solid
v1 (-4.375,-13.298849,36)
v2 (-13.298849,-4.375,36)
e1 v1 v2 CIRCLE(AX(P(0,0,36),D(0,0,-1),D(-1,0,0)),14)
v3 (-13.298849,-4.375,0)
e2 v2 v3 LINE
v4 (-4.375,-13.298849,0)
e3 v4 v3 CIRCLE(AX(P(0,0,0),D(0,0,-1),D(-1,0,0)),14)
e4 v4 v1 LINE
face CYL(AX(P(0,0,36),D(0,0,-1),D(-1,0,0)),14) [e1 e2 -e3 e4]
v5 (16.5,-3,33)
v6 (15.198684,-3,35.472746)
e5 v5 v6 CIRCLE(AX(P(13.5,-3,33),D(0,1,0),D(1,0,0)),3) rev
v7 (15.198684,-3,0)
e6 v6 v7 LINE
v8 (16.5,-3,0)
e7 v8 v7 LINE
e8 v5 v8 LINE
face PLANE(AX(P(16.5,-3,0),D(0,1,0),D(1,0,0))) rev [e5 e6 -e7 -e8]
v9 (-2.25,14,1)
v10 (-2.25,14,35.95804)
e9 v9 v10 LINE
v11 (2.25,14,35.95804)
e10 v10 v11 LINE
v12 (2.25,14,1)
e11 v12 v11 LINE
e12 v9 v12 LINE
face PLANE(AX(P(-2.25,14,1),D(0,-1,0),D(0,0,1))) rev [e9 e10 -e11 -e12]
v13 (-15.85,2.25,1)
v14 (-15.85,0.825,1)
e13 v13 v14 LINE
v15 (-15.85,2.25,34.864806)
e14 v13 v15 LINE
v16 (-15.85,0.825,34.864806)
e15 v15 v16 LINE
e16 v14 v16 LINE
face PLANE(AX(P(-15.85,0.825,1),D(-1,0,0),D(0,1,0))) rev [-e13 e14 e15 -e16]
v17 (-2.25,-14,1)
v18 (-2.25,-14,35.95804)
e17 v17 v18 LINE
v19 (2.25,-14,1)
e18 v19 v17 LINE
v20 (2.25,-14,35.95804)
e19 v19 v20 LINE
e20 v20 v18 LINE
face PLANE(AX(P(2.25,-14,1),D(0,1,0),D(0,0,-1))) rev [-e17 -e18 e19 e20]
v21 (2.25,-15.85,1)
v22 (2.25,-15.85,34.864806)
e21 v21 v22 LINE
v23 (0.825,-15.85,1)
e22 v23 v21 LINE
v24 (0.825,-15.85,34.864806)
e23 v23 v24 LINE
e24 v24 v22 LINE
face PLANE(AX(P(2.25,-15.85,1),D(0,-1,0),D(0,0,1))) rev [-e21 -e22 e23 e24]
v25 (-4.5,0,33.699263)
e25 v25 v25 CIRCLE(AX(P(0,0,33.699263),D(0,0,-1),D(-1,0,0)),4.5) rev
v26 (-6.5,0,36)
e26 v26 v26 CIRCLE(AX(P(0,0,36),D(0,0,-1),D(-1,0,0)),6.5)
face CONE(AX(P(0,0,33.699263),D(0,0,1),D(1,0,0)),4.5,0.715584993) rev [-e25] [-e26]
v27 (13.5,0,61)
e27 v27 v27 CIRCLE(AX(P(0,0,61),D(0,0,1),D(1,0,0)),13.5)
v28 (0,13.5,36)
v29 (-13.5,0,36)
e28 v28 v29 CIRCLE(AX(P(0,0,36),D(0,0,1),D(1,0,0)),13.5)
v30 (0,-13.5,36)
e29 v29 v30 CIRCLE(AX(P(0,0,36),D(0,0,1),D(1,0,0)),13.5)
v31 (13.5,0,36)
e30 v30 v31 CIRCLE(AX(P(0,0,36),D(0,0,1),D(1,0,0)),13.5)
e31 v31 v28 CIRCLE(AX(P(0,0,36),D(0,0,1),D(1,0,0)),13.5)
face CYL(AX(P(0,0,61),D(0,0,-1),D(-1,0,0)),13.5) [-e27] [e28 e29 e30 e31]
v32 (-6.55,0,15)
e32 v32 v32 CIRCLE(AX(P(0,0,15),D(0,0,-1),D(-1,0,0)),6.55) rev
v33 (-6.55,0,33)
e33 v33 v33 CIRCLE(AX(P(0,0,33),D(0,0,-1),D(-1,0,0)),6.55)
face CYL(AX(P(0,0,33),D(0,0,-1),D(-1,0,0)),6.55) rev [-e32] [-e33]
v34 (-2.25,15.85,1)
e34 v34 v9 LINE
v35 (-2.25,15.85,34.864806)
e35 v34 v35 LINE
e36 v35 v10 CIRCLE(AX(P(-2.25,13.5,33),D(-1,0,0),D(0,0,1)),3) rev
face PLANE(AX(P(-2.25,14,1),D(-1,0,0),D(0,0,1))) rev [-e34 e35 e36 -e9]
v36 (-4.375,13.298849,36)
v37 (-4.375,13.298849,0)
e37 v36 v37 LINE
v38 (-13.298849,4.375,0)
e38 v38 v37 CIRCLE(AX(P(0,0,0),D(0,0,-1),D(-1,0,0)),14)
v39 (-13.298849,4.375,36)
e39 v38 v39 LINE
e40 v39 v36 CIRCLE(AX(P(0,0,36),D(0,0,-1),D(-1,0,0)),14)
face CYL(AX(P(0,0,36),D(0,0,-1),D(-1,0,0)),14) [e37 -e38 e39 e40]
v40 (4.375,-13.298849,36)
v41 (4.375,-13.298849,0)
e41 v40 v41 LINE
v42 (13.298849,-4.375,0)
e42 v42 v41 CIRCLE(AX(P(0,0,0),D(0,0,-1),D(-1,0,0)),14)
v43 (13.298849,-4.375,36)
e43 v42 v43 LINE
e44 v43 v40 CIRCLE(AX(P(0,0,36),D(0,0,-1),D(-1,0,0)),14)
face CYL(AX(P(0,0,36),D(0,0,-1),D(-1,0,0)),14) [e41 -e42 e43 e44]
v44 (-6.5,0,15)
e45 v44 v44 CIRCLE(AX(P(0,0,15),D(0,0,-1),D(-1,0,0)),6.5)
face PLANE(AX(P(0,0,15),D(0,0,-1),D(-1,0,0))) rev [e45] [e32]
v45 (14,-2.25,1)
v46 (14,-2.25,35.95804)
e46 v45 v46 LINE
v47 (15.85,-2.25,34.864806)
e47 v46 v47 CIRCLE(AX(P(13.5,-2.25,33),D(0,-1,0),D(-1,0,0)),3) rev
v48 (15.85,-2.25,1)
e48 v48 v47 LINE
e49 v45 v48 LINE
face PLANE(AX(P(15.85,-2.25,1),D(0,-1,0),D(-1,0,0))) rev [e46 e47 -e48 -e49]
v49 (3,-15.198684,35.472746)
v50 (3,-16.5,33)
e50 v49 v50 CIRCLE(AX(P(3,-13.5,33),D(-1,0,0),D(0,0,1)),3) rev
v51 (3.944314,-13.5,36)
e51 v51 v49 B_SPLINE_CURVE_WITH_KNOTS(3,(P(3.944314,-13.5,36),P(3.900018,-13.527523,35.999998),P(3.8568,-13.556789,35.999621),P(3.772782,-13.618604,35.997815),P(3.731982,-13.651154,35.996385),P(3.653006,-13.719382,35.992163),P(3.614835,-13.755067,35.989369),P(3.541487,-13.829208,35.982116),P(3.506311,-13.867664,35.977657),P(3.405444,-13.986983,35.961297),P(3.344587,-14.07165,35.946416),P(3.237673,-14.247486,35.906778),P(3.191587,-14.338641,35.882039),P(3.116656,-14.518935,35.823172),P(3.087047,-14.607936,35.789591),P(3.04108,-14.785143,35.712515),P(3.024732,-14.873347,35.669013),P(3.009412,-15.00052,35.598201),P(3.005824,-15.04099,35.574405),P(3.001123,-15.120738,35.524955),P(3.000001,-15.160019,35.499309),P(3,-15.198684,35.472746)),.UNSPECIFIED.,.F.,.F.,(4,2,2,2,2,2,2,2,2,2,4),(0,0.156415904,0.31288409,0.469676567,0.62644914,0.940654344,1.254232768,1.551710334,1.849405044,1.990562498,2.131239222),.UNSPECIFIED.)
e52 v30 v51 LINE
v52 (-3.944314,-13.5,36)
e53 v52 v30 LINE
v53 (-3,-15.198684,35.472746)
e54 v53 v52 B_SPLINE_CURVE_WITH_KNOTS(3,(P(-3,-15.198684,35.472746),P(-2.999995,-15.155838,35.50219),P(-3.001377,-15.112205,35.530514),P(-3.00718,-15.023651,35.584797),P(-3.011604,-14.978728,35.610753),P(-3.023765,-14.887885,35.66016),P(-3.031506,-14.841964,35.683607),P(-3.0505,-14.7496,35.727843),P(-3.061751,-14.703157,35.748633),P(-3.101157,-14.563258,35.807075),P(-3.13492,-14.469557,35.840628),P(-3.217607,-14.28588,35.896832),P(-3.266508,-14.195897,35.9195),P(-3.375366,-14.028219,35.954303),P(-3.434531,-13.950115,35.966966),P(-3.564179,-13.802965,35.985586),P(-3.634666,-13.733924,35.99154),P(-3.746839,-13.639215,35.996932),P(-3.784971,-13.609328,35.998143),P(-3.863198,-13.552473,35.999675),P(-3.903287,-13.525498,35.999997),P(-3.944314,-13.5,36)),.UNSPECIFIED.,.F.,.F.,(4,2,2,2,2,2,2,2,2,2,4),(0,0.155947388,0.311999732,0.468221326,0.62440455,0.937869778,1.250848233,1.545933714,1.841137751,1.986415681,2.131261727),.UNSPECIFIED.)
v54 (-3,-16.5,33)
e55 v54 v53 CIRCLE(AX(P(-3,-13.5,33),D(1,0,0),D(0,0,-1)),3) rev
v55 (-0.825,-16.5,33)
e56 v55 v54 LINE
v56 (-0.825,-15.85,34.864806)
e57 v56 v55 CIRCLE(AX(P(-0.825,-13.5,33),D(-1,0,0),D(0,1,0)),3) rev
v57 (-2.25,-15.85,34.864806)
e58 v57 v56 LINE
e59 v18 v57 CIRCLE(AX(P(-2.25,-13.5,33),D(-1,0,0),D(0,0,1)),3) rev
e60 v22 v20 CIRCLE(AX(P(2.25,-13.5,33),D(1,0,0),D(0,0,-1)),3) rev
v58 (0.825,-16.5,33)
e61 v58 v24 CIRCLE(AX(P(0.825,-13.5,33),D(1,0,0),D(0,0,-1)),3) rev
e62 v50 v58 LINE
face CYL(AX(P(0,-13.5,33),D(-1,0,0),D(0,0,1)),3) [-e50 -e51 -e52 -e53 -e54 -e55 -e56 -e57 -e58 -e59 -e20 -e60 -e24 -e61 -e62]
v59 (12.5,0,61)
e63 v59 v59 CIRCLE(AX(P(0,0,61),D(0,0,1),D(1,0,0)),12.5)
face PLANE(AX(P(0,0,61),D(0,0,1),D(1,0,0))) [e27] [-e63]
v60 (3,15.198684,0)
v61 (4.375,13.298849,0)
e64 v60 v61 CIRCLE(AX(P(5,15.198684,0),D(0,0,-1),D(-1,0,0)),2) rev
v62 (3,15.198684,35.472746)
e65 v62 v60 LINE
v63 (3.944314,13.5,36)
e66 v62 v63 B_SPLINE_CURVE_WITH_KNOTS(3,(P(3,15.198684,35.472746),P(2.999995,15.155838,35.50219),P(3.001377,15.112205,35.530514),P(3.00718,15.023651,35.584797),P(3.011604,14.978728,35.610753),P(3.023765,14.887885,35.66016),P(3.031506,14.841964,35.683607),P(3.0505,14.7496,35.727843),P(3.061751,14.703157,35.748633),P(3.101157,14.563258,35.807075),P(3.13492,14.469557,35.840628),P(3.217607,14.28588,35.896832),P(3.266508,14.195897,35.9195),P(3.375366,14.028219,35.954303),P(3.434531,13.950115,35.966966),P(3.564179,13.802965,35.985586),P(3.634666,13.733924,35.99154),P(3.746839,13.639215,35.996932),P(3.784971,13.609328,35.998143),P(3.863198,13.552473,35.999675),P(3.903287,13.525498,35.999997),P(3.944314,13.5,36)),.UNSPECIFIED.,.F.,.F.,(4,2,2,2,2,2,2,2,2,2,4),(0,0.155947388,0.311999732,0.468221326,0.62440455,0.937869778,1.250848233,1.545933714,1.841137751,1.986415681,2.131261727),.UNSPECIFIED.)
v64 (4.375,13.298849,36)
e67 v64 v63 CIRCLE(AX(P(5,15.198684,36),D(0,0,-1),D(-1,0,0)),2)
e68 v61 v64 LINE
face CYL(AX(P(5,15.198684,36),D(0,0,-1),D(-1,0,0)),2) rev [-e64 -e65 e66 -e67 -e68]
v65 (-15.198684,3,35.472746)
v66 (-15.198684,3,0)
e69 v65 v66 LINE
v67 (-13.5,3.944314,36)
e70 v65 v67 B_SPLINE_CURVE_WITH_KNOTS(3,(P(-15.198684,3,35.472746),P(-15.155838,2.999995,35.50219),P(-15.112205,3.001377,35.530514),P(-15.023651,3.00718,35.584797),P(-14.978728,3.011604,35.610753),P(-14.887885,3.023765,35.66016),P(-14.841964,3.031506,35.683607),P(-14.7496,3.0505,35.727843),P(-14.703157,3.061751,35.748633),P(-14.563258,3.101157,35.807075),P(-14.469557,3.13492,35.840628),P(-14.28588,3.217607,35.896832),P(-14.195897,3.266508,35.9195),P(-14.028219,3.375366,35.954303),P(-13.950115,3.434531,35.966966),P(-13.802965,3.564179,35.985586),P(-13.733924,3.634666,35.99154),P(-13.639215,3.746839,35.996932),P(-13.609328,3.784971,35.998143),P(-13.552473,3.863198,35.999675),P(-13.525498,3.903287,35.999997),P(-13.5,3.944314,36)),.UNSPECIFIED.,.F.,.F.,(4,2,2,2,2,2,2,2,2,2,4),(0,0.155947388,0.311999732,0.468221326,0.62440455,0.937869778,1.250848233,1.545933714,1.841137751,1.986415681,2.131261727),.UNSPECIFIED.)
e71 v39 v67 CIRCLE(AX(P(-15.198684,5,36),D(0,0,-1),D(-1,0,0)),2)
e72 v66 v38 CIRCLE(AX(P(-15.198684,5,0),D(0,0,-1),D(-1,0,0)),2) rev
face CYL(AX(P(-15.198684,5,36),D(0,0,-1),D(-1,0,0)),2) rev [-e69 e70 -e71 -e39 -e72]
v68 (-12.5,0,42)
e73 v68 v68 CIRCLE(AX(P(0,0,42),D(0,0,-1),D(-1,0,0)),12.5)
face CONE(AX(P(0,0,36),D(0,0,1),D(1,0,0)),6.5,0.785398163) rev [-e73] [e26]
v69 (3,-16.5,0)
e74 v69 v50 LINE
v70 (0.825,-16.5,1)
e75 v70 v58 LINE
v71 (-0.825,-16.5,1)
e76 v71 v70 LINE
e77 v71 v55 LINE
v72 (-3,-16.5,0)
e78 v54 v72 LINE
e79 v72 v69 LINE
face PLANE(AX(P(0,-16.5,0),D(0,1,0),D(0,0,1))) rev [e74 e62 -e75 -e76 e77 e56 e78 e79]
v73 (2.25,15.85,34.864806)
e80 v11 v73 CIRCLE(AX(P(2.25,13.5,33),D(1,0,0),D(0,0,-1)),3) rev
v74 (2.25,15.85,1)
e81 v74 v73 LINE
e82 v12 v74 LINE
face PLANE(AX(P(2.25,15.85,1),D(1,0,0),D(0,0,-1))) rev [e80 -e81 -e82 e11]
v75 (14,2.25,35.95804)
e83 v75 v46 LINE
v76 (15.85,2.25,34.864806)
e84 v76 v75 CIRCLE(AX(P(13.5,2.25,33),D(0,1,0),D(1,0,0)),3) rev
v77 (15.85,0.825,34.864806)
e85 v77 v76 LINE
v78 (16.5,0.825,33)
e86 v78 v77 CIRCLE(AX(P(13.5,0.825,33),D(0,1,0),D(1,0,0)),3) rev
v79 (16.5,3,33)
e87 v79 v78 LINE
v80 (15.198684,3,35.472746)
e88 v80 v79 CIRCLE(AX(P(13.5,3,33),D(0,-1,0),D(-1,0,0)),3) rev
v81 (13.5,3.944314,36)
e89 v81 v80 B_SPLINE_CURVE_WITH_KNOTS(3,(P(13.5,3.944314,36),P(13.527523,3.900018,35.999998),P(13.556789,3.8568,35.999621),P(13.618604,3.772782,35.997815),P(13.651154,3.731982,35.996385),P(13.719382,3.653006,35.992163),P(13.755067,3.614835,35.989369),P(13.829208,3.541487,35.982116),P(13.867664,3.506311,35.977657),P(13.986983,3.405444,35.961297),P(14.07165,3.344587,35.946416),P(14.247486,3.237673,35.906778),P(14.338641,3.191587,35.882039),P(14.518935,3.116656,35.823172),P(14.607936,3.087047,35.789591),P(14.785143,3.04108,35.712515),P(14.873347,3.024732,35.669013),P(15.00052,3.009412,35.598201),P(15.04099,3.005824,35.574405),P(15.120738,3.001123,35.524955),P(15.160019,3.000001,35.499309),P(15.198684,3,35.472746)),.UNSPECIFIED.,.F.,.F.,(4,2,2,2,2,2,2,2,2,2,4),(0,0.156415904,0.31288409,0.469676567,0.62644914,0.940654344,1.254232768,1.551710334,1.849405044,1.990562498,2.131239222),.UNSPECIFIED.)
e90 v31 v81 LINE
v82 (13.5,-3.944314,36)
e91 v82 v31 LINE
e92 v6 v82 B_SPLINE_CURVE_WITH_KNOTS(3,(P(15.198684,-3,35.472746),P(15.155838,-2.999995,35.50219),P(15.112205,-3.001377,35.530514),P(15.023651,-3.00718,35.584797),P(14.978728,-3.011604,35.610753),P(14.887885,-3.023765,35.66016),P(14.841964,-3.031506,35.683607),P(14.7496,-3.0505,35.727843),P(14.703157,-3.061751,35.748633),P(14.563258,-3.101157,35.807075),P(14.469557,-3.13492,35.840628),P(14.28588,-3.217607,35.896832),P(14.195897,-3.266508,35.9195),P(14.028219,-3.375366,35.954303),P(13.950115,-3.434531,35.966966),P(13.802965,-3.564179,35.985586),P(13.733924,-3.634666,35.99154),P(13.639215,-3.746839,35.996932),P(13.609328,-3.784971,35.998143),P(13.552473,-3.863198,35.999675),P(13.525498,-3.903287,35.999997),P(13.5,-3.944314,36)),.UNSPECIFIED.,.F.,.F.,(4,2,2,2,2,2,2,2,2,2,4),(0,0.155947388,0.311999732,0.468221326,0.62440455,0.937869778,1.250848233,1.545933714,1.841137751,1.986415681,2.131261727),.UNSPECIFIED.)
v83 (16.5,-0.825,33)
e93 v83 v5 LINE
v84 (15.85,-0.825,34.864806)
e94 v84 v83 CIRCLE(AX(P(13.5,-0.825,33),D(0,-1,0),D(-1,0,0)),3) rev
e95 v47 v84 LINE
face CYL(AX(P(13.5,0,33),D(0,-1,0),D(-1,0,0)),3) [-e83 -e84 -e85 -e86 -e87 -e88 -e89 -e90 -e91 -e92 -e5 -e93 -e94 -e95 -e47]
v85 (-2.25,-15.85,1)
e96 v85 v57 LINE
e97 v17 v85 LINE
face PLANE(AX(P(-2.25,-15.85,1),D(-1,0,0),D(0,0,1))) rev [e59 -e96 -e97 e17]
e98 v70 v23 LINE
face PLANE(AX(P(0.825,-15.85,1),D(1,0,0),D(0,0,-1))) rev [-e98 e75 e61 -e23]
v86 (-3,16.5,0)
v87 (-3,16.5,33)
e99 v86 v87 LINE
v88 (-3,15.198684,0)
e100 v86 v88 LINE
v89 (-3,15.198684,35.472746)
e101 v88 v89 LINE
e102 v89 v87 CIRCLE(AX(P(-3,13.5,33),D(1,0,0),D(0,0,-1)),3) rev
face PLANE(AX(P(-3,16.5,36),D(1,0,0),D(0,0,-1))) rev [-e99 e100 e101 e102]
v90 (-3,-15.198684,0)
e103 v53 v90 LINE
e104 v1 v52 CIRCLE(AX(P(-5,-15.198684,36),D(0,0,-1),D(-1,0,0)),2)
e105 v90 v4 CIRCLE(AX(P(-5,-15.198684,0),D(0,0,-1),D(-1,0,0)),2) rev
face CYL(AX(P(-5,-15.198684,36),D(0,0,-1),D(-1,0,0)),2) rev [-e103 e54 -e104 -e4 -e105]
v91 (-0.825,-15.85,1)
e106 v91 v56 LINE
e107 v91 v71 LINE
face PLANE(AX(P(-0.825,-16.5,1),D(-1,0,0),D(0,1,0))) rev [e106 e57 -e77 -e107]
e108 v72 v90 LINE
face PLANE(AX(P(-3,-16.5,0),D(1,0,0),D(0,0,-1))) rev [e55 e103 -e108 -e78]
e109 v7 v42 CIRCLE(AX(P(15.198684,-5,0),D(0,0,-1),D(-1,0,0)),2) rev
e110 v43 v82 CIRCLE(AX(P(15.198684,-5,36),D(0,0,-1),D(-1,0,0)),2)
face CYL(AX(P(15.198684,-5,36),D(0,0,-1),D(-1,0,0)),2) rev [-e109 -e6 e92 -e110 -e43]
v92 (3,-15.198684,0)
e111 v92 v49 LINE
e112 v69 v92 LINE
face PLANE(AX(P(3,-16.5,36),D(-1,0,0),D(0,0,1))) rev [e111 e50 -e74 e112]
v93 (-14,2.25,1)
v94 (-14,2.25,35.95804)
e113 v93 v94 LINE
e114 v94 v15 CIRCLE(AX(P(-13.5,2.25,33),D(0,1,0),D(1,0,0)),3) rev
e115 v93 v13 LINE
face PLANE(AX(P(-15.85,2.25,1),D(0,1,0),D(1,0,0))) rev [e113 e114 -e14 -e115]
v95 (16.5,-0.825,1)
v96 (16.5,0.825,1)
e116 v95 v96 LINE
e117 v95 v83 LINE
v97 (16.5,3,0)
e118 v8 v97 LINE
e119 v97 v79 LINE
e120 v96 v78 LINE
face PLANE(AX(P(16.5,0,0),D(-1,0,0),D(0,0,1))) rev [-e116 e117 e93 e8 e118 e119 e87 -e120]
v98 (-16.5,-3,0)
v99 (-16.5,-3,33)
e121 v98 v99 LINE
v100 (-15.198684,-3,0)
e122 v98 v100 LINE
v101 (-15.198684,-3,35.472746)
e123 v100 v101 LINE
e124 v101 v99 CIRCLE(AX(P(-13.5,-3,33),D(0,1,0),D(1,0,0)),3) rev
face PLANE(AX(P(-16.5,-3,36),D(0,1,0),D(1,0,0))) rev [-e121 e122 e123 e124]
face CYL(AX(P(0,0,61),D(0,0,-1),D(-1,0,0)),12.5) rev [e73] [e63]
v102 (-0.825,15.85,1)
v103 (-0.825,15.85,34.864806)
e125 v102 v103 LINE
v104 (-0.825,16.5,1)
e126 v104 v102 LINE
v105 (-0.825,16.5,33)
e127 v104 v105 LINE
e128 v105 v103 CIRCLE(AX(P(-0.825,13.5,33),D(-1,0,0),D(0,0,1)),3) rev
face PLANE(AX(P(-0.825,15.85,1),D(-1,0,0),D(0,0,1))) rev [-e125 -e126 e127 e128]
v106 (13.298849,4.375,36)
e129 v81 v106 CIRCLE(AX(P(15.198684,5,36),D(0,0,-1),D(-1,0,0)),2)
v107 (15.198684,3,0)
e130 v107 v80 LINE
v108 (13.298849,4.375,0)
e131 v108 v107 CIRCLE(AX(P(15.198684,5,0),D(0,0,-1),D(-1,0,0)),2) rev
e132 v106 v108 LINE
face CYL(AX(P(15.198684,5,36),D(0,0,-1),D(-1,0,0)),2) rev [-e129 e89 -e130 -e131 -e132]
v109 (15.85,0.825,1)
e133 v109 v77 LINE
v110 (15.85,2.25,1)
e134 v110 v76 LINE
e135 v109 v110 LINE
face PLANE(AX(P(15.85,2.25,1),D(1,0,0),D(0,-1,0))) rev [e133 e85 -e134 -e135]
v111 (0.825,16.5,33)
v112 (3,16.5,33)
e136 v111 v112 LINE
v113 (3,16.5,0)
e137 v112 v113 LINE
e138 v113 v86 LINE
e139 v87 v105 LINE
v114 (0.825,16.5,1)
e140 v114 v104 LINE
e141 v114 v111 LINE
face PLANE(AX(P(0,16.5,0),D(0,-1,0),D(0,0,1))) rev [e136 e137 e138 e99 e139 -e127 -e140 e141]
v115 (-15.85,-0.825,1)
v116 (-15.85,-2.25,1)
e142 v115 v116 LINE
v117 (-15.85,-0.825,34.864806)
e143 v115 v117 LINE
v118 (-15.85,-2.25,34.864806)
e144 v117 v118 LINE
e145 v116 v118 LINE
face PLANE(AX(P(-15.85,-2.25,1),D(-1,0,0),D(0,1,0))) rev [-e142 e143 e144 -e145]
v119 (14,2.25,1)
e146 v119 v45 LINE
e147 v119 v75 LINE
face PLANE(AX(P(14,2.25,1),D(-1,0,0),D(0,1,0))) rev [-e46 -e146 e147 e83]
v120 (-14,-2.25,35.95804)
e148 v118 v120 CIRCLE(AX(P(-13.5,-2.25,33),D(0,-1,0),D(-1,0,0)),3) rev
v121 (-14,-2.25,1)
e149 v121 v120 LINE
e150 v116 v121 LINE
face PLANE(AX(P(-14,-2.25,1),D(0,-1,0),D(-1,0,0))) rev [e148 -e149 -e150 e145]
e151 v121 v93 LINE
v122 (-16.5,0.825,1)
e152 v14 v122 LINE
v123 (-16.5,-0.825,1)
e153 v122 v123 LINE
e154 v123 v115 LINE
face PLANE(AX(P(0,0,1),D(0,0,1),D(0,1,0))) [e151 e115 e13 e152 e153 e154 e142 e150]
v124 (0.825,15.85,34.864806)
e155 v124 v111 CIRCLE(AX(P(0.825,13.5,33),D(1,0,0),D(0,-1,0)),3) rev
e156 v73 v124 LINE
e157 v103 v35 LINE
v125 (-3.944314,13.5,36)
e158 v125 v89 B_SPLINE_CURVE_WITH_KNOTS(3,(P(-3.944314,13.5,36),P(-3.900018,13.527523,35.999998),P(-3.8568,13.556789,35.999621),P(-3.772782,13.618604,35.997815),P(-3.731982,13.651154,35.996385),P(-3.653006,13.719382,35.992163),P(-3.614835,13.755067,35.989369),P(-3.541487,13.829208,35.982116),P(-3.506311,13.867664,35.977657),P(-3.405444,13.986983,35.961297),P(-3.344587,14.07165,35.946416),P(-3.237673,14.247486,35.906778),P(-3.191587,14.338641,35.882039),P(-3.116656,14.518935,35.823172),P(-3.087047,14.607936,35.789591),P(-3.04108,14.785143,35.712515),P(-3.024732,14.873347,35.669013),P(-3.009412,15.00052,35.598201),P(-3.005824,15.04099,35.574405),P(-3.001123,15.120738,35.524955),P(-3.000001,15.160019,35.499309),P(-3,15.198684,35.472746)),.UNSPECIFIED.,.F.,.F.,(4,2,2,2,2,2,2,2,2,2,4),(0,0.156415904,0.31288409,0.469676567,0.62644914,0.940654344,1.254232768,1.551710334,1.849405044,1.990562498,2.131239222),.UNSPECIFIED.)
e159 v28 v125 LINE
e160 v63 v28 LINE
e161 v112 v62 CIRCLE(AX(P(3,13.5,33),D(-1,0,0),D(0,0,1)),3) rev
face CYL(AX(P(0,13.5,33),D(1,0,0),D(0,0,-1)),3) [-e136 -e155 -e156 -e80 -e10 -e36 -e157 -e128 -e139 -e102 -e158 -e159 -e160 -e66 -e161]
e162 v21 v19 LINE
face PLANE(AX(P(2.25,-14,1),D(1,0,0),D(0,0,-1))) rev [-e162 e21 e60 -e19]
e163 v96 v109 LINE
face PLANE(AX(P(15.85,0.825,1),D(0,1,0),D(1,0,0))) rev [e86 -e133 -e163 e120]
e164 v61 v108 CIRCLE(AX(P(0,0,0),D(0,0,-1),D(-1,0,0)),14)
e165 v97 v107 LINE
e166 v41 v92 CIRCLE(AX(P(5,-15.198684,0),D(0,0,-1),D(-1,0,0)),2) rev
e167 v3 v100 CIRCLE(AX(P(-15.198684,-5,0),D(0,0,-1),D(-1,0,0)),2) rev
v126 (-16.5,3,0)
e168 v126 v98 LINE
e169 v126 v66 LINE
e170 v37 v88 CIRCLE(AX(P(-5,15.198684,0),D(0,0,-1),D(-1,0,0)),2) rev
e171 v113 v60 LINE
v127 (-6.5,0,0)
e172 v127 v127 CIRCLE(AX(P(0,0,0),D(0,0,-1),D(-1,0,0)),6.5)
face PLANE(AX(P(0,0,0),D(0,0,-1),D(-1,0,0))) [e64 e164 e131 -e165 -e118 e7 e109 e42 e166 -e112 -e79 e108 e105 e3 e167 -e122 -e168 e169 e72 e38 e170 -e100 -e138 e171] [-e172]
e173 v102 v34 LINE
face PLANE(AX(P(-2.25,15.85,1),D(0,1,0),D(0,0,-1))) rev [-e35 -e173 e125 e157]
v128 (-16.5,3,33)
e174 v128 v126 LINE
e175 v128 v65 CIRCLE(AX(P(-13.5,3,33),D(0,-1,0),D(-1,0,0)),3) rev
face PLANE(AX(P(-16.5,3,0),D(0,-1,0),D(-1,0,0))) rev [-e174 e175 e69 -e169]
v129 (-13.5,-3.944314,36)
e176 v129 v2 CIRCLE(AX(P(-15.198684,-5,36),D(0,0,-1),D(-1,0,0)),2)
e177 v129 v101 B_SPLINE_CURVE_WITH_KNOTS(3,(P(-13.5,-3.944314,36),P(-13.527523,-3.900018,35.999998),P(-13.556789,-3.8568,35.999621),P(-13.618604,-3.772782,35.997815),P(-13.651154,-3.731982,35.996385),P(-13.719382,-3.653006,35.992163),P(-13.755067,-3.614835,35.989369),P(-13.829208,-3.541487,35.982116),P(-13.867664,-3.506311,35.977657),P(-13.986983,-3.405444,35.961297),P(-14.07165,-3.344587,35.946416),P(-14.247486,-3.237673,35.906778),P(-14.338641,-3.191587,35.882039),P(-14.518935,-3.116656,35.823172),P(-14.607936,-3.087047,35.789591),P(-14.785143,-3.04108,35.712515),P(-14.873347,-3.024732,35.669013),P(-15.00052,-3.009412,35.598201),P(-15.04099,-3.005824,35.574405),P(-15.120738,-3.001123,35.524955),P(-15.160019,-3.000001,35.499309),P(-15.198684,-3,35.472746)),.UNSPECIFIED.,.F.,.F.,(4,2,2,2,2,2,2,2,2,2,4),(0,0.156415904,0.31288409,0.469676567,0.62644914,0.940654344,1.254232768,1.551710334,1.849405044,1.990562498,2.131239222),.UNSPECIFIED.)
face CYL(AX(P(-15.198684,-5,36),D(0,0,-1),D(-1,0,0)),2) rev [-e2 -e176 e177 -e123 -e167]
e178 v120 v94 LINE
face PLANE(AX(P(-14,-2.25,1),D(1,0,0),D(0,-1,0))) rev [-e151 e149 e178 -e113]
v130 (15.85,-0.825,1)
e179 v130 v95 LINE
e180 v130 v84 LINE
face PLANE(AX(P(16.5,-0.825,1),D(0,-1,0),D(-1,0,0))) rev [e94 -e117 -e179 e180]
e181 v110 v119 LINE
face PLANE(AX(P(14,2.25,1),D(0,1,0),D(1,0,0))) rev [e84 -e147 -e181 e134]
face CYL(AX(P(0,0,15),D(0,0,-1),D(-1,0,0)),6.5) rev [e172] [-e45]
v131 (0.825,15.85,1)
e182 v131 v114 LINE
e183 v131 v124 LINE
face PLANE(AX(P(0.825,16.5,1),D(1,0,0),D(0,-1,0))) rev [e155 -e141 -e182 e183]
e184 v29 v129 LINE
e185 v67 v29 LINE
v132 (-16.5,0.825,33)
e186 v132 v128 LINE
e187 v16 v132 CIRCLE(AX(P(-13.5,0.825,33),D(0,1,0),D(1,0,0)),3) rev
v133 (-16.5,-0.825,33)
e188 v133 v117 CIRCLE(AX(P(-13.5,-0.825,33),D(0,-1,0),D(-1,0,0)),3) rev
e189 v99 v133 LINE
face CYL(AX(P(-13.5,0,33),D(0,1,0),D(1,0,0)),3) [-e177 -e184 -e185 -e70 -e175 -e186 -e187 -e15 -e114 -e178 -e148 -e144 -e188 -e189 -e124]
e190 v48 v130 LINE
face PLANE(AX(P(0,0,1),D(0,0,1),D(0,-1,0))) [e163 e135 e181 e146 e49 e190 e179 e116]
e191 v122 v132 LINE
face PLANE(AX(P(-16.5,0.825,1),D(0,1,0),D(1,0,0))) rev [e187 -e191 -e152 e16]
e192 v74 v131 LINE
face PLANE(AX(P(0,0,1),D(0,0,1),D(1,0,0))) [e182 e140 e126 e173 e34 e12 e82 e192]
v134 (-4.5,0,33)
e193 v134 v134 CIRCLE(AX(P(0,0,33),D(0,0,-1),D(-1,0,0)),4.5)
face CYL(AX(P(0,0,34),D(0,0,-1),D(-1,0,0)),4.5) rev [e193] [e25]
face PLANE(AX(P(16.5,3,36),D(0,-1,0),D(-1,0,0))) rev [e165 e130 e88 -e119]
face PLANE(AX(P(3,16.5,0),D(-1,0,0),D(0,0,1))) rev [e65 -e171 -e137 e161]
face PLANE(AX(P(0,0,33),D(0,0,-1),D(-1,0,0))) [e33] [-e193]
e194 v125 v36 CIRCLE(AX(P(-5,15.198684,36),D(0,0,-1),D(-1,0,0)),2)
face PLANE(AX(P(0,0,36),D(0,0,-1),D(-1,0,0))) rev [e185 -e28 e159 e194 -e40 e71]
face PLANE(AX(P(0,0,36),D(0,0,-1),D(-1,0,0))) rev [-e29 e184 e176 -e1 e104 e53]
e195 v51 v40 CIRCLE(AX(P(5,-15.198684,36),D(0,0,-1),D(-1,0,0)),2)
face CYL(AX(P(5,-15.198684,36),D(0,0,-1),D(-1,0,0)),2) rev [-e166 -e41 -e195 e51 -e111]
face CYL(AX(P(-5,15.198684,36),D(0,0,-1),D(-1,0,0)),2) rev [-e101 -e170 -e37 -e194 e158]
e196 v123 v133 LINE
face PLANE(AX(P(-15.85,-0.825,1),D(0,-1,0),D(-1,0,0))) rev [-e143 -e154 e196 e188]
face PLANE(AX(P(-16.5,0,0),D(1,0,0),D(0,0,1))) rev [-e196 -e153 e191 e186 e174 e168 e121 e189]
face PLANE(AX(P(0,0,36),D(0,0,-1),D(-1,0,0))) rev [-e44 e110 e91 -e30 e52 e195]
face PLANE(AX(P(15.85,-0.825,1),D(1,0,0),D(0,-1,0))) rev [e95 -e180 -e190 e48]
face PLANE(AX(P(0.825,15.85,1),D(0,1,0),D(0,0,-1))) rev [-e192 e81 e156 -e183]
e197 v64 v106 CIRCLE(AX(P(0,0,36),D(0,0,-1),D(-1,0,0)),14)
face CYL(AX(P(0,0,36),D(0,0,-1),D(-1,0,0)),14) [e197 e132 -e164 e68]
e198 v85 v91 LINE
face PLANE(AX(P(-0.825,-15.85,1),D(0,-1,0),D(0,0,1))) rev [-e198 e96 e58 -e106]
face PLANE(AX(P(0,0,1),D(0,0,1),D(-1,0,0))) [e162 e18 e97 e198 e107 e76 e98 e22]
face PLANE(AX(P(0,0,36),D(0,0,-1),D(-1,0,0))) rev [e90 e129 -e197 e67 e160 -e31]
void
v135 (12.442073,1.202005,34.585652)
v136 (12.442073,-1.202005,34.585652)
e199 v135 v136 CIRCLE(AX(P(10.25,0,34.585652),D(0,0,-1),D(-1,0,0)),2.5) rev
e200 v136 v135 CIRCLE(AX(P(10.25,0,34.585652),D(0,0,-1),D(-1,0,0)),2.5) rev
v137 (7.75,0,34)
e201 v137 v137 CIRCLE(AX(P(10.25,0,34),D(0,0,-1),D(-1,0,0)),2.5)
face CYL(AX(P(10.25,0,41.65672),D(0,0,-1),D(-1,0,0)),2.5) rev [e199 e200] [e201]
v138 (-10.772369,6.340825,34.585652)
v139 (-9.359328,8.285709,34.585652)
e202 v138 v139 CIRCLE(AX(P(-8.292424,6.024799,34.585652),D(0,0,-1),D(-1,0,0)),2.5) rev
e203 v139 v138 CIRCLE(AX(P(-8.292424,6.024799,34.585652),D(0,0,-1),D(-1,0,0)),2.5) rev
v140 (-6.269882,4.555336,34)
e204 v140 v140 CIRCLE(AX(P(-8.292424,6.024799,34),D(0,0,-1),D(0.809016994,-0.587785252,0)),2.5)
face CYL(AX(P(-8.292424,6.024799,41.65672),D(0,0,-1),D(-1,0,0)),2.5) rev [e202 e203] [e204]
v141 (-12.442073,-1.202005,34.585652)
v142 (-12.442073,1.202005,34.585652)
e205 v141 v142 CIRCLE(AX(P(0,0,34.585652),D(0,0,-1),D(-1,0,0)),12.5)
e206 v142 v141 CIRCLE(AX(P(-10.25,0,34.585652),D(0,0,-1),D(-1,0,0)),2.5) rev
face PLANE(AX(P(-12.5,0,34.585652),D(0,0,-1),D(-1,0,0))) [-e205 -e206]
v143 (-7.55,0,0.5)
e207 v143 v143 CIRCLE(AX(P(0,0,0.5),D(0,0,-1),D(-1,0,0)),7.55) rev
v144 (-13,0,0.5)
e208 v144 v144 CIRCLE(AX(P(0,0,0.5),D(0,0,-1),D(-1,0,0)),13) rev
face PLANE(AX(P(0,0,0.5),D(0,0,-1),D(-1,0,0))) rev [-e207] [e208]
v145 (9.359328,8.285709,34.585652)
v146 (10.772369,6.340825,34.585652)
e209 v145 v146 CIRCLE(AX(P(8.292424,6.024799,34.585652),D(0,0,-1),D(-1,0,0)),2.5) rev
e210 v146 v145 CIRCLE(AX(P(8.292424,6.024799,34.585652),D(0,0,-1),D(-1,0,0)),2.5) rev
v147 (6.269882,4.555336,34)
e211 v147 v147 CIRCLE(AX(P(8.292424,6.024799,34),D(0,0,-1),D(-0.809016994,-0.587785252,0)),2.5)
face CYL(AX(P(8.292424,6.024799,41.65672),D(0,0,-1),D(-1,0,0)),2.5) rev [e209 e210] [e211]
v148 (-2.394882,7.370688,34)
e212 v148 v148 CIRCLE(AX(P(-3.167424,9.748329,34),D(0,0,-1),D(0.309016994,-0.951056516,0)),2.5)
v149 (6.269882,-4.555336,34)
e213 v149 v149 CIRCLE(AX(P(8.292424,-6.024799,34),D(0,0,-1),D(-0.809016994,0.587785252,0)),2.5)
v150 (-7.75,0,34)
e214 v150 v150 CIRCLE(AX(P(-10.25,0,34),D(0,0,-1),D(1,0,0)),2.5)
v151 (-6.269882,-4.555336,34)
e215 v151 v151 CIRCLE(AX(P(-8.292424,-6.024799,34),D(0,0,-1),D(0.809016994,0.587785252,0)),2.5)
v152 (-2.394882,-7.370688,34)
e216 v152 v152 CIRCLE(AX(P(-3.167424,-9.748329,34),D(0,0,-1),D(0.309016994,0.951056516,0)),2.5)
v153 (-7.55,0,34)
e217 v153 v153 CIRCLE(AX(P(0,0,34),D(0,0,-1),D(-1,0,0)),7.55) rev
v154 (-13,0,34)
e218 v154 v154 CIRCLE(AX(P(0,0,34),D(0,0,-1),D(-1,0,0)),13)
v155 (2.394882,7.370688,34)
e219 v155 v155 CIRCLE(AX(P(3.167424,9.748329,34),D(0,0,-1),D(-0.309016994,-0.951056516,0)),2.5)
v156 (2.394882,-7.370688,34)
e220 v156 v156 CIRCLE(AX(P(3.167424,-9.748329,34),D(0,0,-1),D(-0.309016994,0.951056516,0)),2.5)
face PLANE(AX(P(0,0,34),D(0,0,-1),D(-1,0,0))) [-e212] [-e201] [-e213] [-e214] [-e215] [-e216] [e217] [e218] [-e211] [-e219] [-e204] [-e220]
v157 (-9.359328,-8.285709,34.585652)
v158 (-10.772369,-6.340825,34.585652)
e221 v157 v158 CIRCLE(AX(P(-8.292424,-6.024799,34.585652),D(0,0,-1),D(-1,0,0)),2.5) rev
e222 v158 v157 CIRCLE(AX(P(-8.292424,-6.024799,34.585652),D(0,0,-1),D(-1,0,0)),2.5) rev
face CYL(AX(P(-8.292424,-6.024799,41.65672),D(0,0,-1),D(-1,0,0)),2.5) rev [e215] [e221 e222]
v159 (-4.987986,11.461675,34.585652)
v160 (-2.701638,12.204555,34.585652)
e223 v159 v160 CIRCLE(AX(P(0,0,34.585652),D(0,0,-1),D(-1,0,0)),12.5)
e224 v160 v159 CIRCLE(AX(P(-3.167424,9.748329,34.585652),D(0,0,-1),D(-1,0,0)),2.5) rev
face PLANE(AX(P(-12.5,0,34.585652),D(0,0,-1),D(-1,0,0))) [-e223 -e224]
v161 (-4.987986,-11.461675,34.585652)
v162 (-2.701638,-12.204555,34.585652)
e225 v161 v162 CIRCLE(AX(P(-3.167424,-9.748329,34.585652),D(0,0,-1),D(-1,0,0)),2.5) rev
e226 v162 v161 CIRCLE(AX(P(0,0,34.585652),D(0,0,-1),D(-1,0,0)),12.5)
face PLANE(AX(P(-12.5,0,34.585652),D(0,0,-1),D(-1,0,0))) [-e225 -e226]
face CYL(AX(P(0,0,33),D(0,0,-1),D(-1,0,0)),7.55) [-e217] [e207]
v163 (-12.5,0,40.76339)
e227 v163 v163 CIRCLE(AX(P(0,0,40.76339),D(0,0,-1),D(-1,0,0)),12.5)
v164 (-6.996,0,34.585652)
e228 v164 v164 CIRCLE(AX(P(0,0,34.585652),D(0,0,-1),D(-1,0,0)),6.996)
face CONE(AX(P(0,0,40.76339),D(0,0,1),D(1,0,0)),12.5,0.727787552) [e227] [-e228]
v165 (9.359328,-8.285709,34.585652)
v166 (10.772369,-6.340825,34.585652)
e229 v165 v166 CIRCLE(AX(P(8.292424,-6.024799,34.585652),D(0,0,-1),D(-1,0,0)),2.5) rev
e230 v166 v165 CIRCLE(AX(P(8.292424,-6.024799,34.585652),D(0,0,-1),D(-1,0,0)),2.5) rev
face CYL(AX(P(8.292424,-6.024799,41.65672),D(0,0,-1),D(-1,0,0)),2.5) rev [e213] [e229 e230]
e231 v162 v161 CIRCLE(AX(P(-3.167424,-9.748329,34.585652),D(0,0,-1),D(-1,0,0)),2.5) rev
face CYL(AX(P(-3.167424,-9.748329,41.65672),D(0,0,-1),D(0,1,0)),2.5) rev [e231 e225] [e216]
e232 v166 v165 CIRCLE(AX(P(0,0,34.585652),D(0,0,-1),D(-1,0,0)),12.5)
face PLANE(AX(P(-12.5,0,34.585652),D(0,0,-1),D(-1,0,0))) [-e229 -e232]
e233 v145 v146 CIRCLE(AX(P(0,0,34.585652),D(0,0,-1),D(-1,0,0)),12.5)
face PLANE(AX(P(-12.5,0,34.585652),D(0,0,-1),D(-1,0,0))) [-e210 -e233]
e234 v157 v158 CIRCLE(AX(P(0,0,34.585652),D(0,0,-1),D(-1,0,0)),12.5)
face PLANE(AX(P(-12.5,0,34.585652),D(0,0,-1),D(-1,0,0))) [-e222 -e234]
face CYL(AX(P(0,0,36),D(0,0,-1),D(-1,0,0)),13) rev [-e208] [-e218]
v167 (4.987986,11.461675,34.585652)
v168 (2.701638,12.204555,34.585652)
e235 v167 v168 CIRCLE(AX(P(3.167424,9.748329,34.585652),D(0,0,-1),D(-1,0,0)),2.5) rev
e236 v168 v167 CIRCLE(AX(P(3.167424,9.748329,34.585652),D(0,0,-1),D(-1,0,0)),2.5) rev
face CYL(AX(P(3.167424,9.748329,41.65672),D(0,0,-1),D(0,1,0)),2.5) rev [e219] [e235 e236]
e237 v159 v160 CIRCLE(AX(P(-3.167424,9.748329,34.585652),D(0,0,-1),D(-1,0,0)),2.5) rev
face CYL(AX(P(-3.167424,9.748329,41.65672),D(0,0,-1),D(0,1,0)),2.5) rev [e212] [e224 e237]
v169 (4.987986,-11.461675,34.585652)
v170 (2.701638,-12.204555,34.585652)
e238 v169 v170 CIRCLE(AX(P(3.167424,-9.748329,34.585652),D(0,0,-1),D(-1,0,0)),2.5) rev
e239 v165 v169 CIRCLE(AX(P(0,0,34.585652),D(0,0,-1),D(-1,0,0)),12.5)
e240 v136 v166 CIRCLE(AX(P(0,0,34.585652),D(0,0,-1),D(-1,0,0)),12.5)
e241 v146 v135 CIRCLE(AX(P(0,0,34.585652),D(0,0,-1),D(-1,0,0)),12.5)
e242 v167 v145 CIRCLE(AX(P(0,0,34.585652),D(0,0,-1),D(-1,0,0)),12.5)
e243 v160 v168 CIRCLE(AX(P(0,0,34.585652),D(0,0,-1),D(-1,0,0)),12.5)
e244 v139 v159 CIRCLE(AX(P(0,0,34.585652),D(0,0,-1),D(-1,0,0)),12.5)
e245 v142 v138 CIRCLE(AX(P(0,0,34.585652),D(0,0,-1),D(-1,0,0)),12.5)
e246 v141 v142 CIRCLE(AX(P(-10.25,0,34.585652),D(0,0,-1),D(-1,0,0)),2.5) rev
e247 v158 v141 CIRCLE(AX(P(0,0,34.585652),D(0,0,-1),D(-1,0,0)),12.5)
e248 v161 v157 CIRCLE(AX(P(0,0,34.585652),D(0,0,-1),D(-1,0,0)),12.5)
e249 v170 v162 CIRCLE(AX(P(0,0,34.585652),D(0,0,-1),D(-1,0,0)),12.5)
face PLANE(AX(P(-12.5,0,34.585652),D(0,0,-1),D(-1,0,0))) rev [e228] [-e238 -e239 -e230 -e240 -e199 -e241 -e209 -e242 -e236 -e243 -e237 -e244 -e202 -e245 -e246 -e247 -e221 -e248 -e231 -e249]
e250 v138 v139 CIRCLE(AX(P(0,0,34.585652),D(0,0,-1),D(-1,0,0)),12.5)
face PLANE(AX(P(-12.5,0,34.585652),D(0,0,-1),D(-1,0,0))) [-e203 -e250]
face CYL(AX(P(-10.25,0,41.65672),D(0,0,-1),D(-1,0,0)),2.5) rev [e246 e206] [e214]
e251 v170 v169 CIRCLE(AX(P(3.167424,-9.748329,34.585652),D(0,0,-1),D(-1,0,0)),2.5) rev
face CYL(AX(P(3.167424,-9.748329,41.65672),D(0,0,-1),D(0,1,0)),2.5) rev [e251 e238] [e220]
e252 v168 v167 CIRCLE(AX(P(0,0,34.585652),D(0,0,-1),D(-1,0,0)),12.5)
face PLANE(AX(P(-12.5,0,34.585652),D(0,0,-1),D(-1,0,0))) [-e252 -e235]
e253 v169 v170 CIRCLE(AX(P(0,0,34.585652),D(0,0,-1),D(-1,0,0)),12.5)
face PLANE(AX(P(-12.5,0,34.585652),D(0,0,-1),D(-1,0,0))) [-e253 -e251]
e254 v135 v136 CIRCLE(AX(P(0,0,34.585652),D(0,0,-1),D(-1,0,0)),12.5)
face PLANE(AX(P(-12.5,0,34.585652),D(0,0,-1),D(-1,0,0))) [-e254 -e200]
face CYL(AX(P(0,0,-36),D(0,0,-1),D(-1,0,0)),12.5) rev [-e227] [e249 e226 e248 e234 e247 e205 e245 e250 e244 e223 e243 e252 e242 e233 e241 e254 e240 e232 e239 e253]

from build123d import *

# Parameters (mm, degrees)
CROQUIS1_R                 = 14
SALIENTE_EXTRUIR1_DEPTH    = 36
CROQUIS2_R                 = 6.55
CORTAR_EXTRUIR1_DEPTH      = 33
CROQUIS3_R                 = 4.5
CORTAR_EXTRUIR2_DEPTH      = 1
VACIADO3_START             = -36
VACIADO3_OUTLINE_R         = 14
VACIADO3_OUTLINE_R_2       = 7.55
VACIADO3_DEPTH             = 36
VACIADO3_2_OUTLINE_R       = 7.55
VACIADO3_2_DEPTH           = 1
VACIADO3_START_2           = -35
VACIADO3_3_OUTLINE_R       = 7.55
VACIADO3_3_OUTLINE_R_2     = 5.5
VACIADO3_3_DEPTH           = 1
CROQUIS4_R                 = 14
CROQUIS4_R_2               = 13
EXTRUIR_L_MINA1_DEPTH      = 36
CROQUIS11_R                = 13
SALIENTE_EXTRUIR2_DEPTH    = 2
CORTAR_EXTRUIR8_REACH      = 41.345
CROQUIS20_R                = 4.5
SALIENTE_EXTRUIR6_START    = -0.325206
SALIENTE_EXTRUIR6_DEPTH    = 2.825206
CORTAR_EXTRUIR9_DEPTH      = 35
CROQUIS31_R                = 13
CROQUIS31_R_2              = 7
EXTRUIR_L_MINA2_DEPTH      = 0.5
CROQUIS33_R                = 13.5
CROQUIS33_R_2              = 12.5
EXTRUIR_L_MINA3_DEPTH      = 25
REDONDEO2_R                = 2
REDONDEO6_R                = 3
MATRIZC1_COUNT             = 4
REDONDEO2_OF_MATRIZC1_R    = 2
REDONDEO6_OF_MATRIZC1_R    = 3
CHAFL_N2_SIZE              = 2.300736814
CHAFL_N2_SIZE2             = 2
CHAFL_N4_SIZE              = 6
S_LIDO_MOVER_COPIAR2_ANGLE = 180
CROQUIS35_R                = 2.5
CORTAR_EXTRUIR11_DEPTH     = 0.585651992
MATRIZC2_COUNT             = 10
CROQUIS38_R                = 6.75
CROQUIS38_R_2              = 6.5
EXTRUIR_L_MINA4_DEPTH      = 15


# Read off the part's stored shape, not the designer's step: Vaciado3
# Some blends are built 0.0001 mm under size
with BuildPart() as part:
    # Croquis1 → Saliente-Extruir1 (new body)
    with BuildSketch(Plane.XY):
        Circle(CROQUIS1_R)
    extrude(amount=-SALIENTE_EXTRUIR1_DEPTH)

    # Croquis2 → Cortar-Extruir1 (cut)
    with BuildSketch(Plane.XY):
        Circle(CROQUIS2_R)
    extrude(amount=-CORTAR_EXTRUIR1_DEPTH, mode=Mode.SUBTRACT)

    # Croquis3 → Cortar-Extruir2 (cut)
    with BuildSketch(Plane.XY.offset(-33)):
        Circle(CROQUIS3_R)
    extrude(amount=-CORTAR_EXTRUIR2_DEPTH, mode=Mode.SUBTRACT)

    # Vaciado3 outline → Vaciado3 (cut)
    with BuildSketch(Plane.XY.offset(VACIADO3_START)):
        Circle(VACIADO3_OUTLINE_R)
        Circle(VACIADO3_OUTLINE_R_2, mode=Mode.SUBTRACT)
    extrude(amount=VACIADO3_DEPTH, mode=Mode.SUBTRACT)

    # Vaciado3 2 outline → Vaciado3 2 (cut)
    with BuildSketch(Plane.XY.offset(VACIADO3_START)):
        Circle(VACIADO3_2_OUTLINE_R)
    extrude(amount=VACIADO3_2_DEPTH, mode=Mode.SUBTRACT)

    # Vaciado3 3 outline → Vaciado3 3 (cut)
    with BuildSketch(Plane.XY.offset(VACIADO3_START_2)):
        Circle(VACIADO3_3_OUTLINE_R)
        Circle(VACIADO3_3_OUTLINE_R_2, mode=Mode.SUBTRACT)
    extrude(amount=VACIADO3_3_DEPTH, mode=Mode.SUBTRACT)



with BuildPart() as body_2:
    # Croquis4 → Extruir-Lámina1 (new body)
    with BuildSketch(Plane.XY):
        Circle(CROQUIS4_R)
        Circle(CROQUIS4_R_2, mode=Mode.SUBTRACT)
    extrude(amount=-EXTRUIR_L_MINA1_DEPTH)


with BuildPart() as part_1:
    add(part.part)

    add(body_2.part)  # Saliente-Extruir2 merges body 2
    # Croquis11 → Saliente-Extruir2 (add)
    with BuildSketch(Plane.XY.offset(-34)):
        Circle(CROQUIS11_R)
    extrude(amount=-SALIENTE_EXTRUIR2_DEPTH)

    # Croquis20 → Cortar-Extruir8 (cut, up to next)
    with BuildSketch(Plane.XY.offset(-34), mode=Mode.PRIVATE) as cortar_extruir8_sk1:
        Circle(CROQUIS20_R)
    cortar_extruir8_tool1 = extrude(cortar_extruir8_sk1.sketch, amount=-CORTAR_EXTRUIR8_REACH, mode=Mode.PRIVATE) & part_1.part
    add(cortar_extruir8_tool1.solids().sort_by_distance((0, 0, -34))[0], mode=Mode.SUBTRACT)

    # Croquis21 → Saliente-Extruir6 (add)
    with BuildSketch(Plane(origin=(0, 14, 0), x_dir=(1, 0, 0), z_dir=(0, 1, 0)).offset(SALIENTE_EXTRUIR6_START)):
        Polygon((0, 0), (-3, 0), (-3, 36), (3, 36), (3, 0), align=None)
    saliente_extruir6 = extrude(amount=SALIENTE_EXTRUIR6_DEPTH)

    # Croquis29 → Cortar-Extruir9 (cut)
    with BuildSketch(Plane(origin=(0, 0, -36), x_dir=(-1, 0, 0), z_dir=(0, 0, -1))):
        Polygon((-2.25, 14), (2.25, 14), (2.25, 15.85), (0.825, 15.85), (0.825, 16.5), (-0.825, 16.5), (-0.825, 15.85), (-2.25, 15.85), align=None)
    cortar_extruir9 = extrude(amount=-CORTAR_EXTRUIR9_DEPTH, mode=Mode.SUBTRACT)

    # Croquis31 → Extruir-Lámina2 (add)
    with BuildSketch(Plane.XY):
        Circle(CROQUIS31_R)
        Circle(CROQUIS31_R_2, mode=Mode.SUBTRACT)
    extrude(amount=-EXTRUIR_L_MINA2_DEPTH)

    # Croquis33 → Extruir-Lámina3 (add)
    with BuildSketch(Plane(origin=(0, 0, -36), x_dir=(-1, 0, 0), z_dir=(0, 0, -1))):
        Circle(CROQUIS33_R)
        Circle(CROQUIS33_R_2, mode=Mode.SUBTRACT)
    extrude(amount=EXTRUIR_L_MINA3_DEPTH)

    # Redondeo2
    redondeo2_edges = [part_1.edges().sort_by_distance(p)[0] for p in [
        (-3, 13.674794, -18),
        (3, 13.674794, -18),
    ]]
    fillet(redondeo2_edges, radius=REDONDEO2_R)

    # Redondeo6
    # the kernel refuses this fillet: 3 mm, written as the material it takes off along each edge
    with BuildSketch(Plane(origin=(-10.5, 16.5, -36), x_dir=(0, 0, 1), z_dir=(1, 0, 0))) as redondeo6_piece_1:
        with BuildLine():
            CenterArc((REDONDEO6_R, REDONDEO6_R), REDONDEO6_R, 180, 90)
            Line((0, REDONDEO6_R), (0, 0))
            Line((0, 0), (REDONDEO6_R, 0))
        make_face()
    extrude(amount=17.175, mode=Mode.SUBTRACT)

    # MatrizC1: Saliente-Extruir6, Cortar-Extruir9 ×4 about axis
    matrizc1_axis = Axis((0, 0, 0), (0, 0, 1))
    add([saliente_extruir6.rotate(matrizc1_axis, i * 360 / MATRIZC1_COUNT) for i in range(1, MATRIZC1_COUNT)])
    add([cortar_extruir9.rotate(matrizc1_axis, i * 360 / MATRIZC1_COUNT) for i in range(1, MATRIZC1_COUNT)], mode=Mode.SUBTRACT)

    # Redondeo2 of MatrizC1
    redondeo2_of_matrizc1_edges = [part_1.edges().sort_by_distance(p)[0] for p in [
        (-13.674794, -3, -18),
        (-13.674794, 3, -18),
        (3, -13.674794, -18),
        (-3, -13.674794, -18),
        (13.674794, 3, -18),
        (13.674794, -3, -18),
    ]]
    fillet(redondeo2_of_matrizc1_edges, radius=REDONDEO2_OF_MATRIZC1_R)

    # Redondeo6 of MatrizC1
    # the kernel refuses this fillet: 3 mm, written as the material it takes off along each edge
    with BuildSketch(Plane(origin=(-16.5, -10.5, -36), x_dir=(0, 0, 1), z_dir=(0, 1, 0)), Plane(origin=(10.5, -16.5, -36), x_dir=(0, 0, 1), z_dir=(-1, 0, 0)), Plane(origin=(16.5, 10.5, -36), x_dir=(0, 0, 1), z_dir=(0, -1, 0))) as redondeo6_of_matrizc1_piece_1:
        with BuildLine():
            CenterArc((REDONDEO6_OF_MATRIZC1_R, REDONDEO6_OF_MATRIZC1_R), REDONDEO6_OF_MATRIZC1_R, 180, 90)
            Line((0, REDONDEO6_OF_MATRIZC1_R), (0, 0))
            Line((0, 0), (REDONDEO6_OF_MATRIZC1_R, 0))
        make_face()
    extrude(amount=17.175, mode=Mode.SUBTRACT)

    # Chaflán2
    chafl_n2_edges = [part_1.edges().sort_by_distance(p)[0] for p in [
        (-4.5, 0, -36),
    ]]
    chafl_n2_side = [part_1.faces().sort_by_distance(p)[0] for p in [
        (-4.5, 0, -34.5),
    ]]
    chamfer(chafl_n2_edges, length=CHAFL_N2_SIZE, length2=CHAFL_N2_SIZE2, reference=chafl_n2_side[0])

    # Chaflán4
    chafl_n4_edges = [part_1.edges().sort_by_distance(p)[0] for p in [
        (12.5, 0, -36),
    ]]
    chamfer(chafl_n4_edges, length=CHAFL_N4_SIZE - 0.0001)  # a hair under: the kernel refuses the full size


with BuildPart() as part_2:
    # Sólido-Mover/Copiar2: moved
    add(part_1.part.rotate(Axis((0, 0, 0), (0, 1, 0)), S_LIDO_MOVER_COPIAR2_ANGLE))

    # Croquis34 → Cortar-Revolución1 (revolve, cut)
    with BuildSketch(Plane(origin=(0, 0, 0), x_dir=(1, 0, 0), z_dir=(0, 1, 0))):
        Polygon((-12.5, -40.763390042), (-12.5, -34.585651992), (-6.995999587, -34.585651992), align=None)
    revolve(axis=Axis((0, 0, -36), (0, 0, 1)), mode=Mode.SUBTRACT)

    # Croquis35 → Cortar-Extruir11 (cut)
    with BuildSketch(Plane(origin=(0, 0, 34), x_dir=(-1, 0, 0), z_dir=(0, 0, -1))):
        with Locations((-10.25, 0)):
            Circle(CROQUIS35_R)
    cortar_extruir11 = extrude(amount=-CORTAR_EXTRUIR11_DEPTH, mode=Mode.SUBTRACT)

    # MatrizC2: Cortar-Extruir11 ×10 about axis
    matrizc2_axis = Axis((0, 0, 0), (0, 0, 1))
    for i in range(1, MATRIZC2_COUNT):
        add(cortar_extruir11.rotate(matrizc2_axis, i * 360 / MATRIZC2_COUNT), mode=Mode.SUBTRACT)

    # Croquis38 → Extruir-Lámina4 (add)
    with BuildSketch(Plane(origin=(0, 0, 0), x_dir=(-1, 0, 0), z_dir=(0, 0, -1))):
        Circle(CROQUIS38_R)
        Circle(CROQUIS38_R_2, mode=Mode.SUBTRACT)
    extrude(amount=-EXTRUIR_L_MINA4_DEPTH)


solid = part_2.part
